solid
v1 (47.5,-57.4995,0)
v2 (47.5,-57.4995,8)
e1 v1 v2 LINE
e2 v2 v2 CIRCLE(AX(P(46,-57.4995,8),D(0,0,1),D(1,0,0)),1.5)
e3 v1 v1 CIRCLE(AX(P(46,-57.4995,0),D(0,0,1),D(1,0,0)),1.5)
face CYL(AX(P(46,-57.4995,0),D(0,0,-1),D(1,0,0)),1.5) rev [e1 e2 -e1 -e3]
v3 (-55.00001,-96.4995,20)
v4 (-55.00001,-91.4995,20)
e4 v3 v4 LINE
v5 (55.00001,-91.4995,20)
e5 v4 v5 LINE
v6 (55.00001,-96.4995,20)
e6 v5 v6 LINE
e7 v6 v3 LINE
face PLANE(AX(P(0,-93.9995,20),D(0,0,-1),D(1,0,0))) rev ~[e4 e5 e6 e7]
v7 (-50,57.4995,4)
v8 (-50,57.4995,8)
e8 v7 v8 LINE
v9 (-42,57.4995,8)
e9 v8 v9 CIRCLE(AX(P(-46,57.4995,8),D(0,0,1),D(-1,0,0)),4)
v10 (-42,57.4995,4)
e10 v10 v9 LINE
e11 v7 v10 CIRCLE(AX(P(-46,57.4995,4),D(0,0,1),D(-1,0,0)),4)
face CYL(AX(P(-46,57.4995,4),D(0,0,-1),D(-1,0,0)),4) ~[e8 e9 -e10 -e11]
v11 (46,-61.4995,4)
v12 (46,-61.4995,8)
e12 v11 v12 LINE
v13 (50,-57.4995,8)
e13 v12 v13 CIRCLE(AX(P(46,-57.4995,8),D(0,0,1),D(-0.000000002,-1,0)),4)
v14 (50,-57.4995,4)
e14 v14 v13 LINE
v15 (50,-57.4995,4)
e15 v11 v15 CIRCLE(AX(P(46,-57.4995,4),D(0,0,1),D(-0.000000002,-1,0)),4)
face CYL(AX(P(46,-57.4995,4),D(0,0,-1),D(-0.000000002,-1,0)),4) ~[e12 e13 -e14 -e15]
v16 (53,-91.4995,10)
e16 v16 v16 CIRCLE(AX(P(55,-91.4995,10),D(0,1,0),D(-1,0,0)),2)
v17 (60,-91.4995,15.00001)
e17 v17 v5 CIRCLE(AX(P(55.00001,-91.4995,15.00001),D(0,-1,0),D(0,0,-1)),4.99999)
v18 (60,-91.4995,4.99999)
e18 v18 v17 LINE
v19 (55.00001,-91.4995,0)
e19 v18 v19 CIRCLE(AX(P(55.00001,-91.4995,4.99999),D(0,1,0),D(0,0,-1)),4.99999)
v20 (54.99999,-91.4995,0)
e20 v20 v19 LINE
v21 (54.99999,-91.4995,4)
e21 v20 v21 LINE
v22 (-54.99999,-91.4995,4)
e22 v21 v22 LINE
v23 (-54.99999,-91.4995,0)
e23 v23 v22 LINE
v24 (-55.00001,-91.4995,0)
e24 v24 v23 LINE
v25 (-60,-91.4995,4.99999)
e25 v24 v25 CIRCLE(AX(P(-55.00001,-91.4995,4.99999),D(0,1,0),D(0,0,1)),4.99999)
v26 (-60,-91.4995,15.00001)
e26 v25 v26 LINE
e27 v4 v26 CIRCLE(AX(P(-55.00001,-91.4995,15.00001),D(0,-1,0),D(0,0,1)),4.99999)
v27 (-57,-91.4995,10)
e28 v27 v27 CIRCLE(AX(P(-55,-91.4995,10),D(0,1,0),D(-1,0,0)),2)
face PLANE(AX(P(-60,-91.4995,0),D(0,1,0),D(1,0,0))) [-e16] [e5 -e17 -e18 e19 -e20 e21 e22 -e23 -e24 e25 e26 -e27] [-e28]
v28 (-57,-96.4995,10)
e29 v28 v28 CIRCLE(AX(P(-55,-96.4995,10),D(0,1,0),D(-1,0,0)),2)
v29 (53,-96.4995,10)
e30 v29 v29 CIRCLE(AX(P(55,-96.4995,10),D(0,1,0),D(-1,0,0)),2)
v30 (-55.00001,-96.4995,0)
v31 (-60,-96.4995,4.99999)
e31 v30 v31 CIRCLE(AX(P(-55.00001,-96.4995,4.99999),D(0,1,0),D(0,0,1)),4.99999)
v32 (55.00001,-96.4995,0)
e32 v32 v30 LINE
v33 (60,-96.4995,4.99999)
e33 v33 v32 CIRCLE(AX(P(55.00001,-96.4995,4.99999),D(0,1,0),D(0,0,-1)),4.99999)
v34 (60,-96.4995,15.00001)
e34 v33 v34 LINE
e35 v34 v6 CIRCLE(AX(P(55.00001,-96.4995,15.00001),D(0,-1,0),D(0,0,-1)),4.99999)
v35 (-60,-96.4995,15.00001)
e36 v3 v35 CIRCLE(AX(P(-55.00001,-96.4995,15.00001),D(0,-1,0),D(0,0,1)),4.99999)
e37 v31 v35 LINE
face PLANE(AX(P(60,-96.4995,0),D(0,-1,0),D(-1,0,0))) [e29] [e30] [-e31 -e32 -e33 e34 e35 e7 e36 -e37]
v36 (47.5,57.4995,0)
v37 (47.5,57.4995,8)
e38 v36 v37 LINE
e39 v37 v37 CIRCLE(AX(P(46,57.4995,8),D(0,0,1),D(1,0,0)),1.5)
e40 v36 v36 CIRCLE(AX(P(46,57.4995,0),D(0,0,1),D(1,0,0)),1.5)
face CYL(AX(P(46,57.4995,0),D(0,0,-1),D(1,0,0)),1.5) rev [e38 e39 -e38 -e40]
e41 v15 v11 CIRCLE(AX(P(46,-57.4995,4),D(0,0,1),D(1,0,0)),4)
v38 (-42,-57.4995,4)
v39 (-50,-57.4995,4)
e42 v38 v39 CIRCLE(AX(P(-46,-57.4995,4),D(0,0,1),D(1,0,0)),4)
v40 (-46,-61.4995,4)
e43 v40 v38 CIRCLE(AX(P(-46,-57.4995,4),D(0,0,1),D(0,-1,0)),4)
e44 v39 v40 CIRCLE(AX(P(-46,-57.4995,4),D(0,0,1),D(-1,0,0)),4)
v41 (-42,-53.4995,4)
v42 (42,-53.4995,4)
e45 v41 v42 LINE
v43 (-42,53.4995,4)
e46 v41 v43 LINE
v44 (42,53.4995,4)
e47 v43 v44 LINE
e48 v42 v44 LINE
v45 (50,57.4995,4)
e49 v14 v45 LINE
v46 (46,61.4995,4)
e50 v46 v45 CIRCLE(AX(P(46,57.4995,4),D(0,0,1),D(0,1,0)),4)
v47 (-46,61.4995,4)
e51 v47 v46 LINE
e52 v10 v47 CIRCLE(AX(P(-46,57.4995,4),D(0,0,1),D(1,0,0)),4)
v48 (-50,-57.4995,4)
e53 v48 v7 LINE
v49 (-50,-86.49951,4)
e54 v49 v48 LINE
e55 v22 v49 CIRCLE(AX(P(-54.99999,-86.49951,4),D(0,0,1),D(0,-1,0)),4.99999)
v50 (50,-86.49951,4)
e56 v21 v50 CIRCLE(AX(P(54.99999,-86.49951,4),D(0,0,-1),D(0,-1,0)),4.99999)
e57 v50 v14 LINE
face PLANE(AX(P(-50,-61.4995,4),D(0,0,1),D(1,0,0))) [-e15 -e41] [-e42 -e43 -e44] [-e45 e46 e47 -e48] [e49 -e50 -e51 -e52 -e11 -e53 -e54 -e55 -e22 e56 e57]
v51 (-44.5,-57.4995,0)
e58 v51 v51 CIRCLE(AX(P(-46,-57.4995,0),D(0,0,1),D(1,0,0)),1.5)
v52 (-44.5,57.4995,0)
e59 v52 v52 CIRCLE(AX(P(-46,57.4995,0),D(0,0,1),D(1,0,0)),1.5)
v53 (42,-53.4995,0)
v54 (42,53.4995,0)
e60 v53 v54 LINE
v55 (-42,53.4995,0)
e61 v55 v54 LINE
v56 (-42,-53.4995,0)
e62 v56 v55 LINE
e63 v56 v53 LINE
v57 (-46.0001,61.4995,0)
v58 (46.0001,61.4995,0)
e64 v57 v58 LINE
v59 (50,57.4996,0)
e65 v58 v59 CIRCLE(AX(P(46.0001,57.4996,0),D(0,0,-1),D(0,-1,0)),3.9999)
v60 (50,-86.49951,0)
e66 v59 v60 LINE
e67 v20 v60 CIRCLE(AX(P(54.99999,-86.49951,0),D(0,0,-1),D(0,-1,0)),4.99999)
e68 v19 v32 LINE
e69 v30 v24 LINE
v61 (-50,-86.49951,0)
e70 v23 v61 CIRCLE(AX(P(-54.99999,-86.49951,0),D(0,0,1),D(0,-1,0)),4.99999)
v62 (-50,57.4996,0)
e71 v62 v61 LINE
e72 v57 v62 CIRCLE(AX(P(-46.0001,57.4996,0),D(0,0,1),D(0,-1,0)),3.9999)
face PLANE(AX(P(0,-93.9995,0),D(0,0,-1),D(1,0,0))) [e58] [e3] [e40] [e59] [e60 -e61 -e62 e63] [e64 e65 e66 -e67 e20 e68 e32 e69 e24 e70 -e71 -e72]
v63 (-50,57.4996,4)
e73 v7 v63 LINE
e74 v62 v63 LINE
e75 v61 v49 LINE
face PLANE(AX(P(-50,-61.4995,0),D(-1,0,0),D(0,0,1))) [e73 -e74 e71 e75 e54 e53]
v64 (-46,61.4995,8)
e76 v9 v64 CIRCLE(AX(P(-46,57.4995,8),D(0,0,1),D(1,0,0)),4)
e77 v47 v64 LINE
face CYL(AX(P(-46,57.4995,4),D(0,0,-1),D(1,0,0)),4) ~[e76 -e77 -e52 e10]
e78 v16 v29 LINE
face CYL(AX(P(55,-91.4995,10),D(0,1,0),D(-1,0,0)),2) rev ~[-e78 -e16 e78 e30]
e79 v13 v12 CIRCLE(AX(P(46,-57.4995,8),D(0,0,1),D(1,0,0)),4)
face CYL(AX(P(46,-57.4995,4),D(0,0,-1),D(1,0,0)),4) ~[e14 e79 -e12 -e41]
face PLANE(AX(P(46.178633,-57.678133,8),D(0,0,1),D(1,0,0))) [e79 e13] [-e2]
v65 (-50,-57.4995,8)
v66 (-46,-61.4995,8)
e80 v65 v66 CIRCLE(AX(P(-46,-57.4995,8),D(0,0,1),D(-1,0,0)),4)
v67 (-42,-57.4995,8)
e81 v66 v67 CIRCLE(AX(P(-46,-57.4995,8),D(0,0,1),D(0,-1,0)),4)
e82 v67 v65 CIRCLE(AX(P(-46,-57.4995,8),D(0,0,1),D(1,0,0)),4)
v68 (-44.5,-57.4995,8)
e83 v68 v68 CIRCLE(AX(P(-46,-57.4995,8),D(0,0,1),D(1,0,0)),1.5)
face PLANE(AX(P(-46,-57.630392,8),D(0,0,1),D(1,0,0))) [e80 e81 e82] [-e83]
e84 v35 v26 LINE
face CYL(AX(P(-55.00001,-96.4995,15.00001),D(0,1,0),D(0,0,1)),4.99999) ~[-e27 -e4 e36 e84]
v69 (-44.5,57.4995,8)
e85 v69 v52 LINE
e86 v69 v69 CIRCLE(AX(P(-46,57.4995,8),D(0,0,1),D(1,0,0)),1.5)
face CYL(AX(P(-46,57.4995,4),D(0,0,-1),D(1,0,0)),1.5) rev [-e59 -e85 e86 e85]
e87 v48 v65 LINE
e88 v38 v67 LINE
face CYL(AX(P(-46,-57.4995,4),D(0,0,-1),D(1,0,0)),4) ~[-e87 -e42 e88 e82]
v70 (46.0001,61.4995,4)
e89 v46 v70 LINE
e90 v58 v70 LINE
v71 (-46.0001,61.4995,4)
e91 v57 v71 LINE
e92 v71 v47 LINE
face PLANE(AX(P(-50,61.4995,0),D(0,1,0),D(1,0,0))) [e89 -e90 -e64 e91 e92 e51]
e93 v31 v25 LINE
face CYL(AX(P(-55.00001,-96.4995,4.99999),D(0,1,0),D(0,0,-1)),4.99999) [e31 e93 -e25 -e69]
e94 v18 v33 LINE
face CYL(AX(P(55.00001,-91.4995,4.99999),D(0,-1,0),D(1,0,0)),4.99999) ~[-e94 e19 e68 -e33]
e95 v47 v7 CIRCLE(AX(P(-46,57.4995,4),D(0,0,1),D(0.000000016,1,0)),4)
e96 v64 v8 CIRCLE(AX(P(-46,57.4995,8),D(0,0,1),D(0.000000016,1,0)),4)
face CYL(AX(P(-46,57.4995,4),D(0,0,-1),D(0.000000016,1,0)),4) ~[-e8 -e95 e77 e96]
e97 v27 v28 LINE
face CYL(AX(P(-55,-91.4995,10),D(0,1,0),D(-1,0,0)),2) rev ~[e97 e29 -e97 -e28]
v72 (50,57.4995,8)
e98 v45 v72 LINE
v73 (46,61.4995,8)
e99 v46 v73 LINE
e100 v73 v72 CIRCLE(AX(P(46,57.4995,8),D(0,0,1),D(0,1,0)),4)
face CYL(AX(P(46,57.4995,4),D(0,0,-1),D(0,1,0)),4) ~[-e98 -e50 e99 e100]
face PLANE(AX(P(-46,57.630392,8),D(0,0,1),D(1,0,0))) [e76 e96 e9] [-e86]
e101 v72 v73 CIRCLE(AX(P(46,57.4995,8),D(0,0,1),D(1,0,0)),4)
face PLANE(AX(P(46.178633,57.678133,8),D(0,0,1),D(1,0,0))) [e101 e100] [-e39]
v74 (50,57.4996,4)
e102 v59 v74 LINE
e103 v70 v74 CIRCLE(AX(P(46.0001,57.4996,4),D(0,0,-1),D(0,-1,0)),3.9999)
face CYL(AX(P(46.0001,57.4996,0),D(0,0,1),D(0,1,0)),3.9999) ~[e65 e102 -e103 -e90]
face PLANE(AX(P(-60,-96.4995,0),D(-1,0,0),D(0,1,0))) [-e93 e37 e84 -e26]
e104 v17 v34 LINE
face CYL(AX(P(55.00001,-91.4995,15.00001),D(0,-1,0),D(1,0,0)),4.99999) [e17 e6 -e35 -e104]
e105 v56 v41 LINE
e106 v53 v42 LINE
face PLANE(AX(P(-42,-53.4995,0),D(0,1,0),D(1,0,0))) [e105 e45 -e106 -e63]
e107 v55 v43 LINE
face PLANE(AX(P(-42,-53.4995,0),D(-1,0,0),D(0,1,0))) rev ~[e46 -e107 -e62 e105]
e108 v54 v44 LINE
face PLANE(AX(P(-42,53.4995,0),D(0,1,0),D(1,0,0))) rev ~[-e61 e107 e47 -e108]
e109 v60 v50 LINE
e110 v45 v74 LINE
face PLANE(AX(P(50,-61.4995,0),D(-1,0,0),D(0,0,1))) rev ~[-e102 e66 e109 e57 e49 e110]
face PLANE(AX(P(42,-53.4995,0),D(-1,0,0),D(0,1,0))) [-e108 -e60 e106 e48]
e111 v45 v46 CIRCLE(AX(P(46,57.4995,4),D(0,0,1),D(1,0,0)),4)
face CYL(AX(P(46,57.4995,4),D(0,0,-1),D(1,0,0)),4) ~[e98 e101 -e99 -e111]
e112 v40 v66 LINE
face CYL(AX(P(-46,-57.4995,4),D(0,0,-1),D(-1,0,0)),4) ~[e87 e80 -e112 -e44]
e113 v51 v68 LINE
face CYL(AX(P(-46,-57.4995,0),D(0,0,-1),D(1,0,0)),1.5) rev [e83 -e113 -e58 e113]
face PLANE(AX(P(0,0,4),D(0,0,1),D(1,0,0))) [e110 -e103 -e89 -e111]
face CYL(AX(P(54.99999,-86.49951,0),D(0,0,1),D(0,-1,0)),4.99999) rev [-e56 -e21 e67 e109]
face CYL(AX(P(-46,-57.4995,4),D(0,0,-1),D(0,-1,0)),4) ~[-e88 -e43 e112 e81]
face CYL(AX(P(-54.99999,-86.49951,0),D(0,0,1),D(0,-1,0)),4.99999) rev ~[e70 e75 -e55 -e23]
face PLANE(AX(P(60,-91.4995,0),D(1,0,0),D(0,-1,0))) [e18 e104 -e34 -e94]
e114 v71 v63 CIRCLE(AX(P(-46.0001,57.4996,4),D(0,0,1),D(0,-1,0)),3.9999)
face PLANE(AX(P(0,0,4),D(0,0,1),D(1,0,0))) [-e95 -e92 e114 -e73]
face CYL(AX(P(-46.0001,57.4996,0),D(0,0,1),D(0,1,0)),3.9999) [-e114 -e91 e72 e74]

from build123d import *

# Parameters (mm, degrees)
F0_W      = 100
F0_H      = 122.999
F0_R      = 1.5
F0_W_2    = 84
F0_H_2    = 106.999
F1_DEPTH  = 4
F2_R      = 1.5
F3_DEPTH  = 4
F4_W      = 100
F4_H      = 4
F5_DEPTH  = 30
F7_DEPTH  = 20
F8_R      = 4.99999
F9_R      = 3.9999
F10_R     = 2
F11_DEPTH = 10


# Not quite as in the source:
# - a fillet or chamfer is up to 0.001 mm smaller than in the source, because OpenCascade refuses the exact size


with BuildPart() as f1:
    # F0 (on Top) → F1 (new body)
    with BuildSketch(Plane.XY):
        Rectangle(F0_W, F0_H)
        with Locations((-46, -57.4995)):
            Circle(F0_R, mode=Mode.SUBTRACT)
        with Locations((46, -57.4995)):
            Circle(F0_R, mode=Mode.SUBTRACT)
        with Locations((-46, 57.4995)):
            Circle(F0_R, mode=Mode.SUBTRACT)
        Rectangle(F0_W_2, F0_H_2, mode=Mode.SUBTRACT)
        with Locations((46, 57.4995)):
            Circle(F0_R, mode=Mode.SUBTRACT)
    extrude(amount=F1_DEPTH)

    # F2 (on face) → F3 (join)
    with BuildSketch(Plane.XY.offset(4)):
        with BuildLine():
            ThreePointArc((-42, 57.4995), (-43.1715728523, 60.3279271017), (-45.999999935, 61.4995))
            ThreePointArc((-45.999999935, 61.4995), (-48.8284271017, 60.3279271477), (-50, 57.4995))
            ThreePointArc((-50, 57.4995), (-46, 53.4995), (-42, 57.4995))
        make_face()
        with Locations((-46, 57.4995)):
            Circle(F2_R, mode=Mode.SUBTRACT)
        with BuildLine():
            ThreePointArc((46, 61.4995), (43.1715728753, 54.6710728753), (50, 57.4995))
            ThreePointArc((50, 57.4995), (48.8284271247, 60.3279271247), (46, 61.4995))
        make_face()
        with Locations((46, 57.4995)):
            Circle(F2_R, mode=Mode.SUBTRACT)
        with BuildLine():
            ThreePointArc((45.9999999936, -61.4995), (48.8284271225, -60.327927127), (50, -57.4995))
            ThreePointArc((50, -57.4995), (43.1715728775, -54.671072873), (45.9999999936, -61.4995))
        make_face()
        with Locations((46, -57.4995)):
            Circle(F2_R, mode=Mode.SUBTRACT)
        with BuildLine():
            ThreePointArc((-50, -57.4995), (-48.8284271247, -60.3279271247), (-46, -61.4995))
            ThreePointArc((-46, -61.4995), (-43.1715728753, -60.3279271247), (-42, -57.4995))
            ThreePointArc((-42, -57.4995), (-46, -53.4995), (-50, -57.4995))
        make_face()
        with Locations((-46, -57.4995)):
            Circle(F2_R, mode=Mode.SUBTRACT)
    extrude(amount=F3_DEPTH)

    # F4 (on face) → F5 (join)
    with BuildSketch(Plane.XZ.offset(61.4995)):
        with Locations((0, 2)):
            Rectangle(F4_W, F4_H)
    extrude(amount=F5_DEPTH)

    # F6 (on face) → F7 (join)
    with BuildSketch(Plane(origin=(0, 0, 0), x_dir=(1, 0, 0), z_dir=(0, 0, -1))):
        Polygon((50, 91.4995), (60, 91.4995), (60, 96.4995), (-50, 96.4995), (-60, 96.4995), (-60, 91.4995), (-50, 91.4995), align=None)
    extrude(amount=-F7_DEPTH)

    # F8 (radius 5 in the source; OpenCascade refuses exactly that, so slightly less here)
    f8_edges = [f1.edges().sort_by_distance(p)[0] for p in [
        (-60, -93.9995, 20),
        (-60, -93.9995, 0),
        (60, -93.9995, 0),
        (60, -93.9995, 20),
        (50, -91.4995, 2),
        (-50, -91.4995, 2),
    ]]
    fillet(f8_edges, radius=F8_R)

    # F9 (radius 4 in the source; OpenCascade refuses exactly that, so slightly less here)
    f9_edges = [f1.edges().sort_by_distance(p)[0] for p in [
        (50, 61.4995, 2),
        (-50, 61.4995, 2),
    ]]
    fillet(f9_edges, radius=F9_R)

    # F10 (on face) → F11 (cut)
    with BuildSketch(Plane(origin=(0, -91.4995, 0), x_dir=(-1, 0, 0), z_dir=(0, 1, 0))):
        with Locations((55, 10)):
            Circle(F10_R)
        with Locations((-55, 10)):
            Circle(F10_R)
    extrude(amount=-F11_DEPTH, mode=Mode.SUBTRACT)


solid = f1.part
